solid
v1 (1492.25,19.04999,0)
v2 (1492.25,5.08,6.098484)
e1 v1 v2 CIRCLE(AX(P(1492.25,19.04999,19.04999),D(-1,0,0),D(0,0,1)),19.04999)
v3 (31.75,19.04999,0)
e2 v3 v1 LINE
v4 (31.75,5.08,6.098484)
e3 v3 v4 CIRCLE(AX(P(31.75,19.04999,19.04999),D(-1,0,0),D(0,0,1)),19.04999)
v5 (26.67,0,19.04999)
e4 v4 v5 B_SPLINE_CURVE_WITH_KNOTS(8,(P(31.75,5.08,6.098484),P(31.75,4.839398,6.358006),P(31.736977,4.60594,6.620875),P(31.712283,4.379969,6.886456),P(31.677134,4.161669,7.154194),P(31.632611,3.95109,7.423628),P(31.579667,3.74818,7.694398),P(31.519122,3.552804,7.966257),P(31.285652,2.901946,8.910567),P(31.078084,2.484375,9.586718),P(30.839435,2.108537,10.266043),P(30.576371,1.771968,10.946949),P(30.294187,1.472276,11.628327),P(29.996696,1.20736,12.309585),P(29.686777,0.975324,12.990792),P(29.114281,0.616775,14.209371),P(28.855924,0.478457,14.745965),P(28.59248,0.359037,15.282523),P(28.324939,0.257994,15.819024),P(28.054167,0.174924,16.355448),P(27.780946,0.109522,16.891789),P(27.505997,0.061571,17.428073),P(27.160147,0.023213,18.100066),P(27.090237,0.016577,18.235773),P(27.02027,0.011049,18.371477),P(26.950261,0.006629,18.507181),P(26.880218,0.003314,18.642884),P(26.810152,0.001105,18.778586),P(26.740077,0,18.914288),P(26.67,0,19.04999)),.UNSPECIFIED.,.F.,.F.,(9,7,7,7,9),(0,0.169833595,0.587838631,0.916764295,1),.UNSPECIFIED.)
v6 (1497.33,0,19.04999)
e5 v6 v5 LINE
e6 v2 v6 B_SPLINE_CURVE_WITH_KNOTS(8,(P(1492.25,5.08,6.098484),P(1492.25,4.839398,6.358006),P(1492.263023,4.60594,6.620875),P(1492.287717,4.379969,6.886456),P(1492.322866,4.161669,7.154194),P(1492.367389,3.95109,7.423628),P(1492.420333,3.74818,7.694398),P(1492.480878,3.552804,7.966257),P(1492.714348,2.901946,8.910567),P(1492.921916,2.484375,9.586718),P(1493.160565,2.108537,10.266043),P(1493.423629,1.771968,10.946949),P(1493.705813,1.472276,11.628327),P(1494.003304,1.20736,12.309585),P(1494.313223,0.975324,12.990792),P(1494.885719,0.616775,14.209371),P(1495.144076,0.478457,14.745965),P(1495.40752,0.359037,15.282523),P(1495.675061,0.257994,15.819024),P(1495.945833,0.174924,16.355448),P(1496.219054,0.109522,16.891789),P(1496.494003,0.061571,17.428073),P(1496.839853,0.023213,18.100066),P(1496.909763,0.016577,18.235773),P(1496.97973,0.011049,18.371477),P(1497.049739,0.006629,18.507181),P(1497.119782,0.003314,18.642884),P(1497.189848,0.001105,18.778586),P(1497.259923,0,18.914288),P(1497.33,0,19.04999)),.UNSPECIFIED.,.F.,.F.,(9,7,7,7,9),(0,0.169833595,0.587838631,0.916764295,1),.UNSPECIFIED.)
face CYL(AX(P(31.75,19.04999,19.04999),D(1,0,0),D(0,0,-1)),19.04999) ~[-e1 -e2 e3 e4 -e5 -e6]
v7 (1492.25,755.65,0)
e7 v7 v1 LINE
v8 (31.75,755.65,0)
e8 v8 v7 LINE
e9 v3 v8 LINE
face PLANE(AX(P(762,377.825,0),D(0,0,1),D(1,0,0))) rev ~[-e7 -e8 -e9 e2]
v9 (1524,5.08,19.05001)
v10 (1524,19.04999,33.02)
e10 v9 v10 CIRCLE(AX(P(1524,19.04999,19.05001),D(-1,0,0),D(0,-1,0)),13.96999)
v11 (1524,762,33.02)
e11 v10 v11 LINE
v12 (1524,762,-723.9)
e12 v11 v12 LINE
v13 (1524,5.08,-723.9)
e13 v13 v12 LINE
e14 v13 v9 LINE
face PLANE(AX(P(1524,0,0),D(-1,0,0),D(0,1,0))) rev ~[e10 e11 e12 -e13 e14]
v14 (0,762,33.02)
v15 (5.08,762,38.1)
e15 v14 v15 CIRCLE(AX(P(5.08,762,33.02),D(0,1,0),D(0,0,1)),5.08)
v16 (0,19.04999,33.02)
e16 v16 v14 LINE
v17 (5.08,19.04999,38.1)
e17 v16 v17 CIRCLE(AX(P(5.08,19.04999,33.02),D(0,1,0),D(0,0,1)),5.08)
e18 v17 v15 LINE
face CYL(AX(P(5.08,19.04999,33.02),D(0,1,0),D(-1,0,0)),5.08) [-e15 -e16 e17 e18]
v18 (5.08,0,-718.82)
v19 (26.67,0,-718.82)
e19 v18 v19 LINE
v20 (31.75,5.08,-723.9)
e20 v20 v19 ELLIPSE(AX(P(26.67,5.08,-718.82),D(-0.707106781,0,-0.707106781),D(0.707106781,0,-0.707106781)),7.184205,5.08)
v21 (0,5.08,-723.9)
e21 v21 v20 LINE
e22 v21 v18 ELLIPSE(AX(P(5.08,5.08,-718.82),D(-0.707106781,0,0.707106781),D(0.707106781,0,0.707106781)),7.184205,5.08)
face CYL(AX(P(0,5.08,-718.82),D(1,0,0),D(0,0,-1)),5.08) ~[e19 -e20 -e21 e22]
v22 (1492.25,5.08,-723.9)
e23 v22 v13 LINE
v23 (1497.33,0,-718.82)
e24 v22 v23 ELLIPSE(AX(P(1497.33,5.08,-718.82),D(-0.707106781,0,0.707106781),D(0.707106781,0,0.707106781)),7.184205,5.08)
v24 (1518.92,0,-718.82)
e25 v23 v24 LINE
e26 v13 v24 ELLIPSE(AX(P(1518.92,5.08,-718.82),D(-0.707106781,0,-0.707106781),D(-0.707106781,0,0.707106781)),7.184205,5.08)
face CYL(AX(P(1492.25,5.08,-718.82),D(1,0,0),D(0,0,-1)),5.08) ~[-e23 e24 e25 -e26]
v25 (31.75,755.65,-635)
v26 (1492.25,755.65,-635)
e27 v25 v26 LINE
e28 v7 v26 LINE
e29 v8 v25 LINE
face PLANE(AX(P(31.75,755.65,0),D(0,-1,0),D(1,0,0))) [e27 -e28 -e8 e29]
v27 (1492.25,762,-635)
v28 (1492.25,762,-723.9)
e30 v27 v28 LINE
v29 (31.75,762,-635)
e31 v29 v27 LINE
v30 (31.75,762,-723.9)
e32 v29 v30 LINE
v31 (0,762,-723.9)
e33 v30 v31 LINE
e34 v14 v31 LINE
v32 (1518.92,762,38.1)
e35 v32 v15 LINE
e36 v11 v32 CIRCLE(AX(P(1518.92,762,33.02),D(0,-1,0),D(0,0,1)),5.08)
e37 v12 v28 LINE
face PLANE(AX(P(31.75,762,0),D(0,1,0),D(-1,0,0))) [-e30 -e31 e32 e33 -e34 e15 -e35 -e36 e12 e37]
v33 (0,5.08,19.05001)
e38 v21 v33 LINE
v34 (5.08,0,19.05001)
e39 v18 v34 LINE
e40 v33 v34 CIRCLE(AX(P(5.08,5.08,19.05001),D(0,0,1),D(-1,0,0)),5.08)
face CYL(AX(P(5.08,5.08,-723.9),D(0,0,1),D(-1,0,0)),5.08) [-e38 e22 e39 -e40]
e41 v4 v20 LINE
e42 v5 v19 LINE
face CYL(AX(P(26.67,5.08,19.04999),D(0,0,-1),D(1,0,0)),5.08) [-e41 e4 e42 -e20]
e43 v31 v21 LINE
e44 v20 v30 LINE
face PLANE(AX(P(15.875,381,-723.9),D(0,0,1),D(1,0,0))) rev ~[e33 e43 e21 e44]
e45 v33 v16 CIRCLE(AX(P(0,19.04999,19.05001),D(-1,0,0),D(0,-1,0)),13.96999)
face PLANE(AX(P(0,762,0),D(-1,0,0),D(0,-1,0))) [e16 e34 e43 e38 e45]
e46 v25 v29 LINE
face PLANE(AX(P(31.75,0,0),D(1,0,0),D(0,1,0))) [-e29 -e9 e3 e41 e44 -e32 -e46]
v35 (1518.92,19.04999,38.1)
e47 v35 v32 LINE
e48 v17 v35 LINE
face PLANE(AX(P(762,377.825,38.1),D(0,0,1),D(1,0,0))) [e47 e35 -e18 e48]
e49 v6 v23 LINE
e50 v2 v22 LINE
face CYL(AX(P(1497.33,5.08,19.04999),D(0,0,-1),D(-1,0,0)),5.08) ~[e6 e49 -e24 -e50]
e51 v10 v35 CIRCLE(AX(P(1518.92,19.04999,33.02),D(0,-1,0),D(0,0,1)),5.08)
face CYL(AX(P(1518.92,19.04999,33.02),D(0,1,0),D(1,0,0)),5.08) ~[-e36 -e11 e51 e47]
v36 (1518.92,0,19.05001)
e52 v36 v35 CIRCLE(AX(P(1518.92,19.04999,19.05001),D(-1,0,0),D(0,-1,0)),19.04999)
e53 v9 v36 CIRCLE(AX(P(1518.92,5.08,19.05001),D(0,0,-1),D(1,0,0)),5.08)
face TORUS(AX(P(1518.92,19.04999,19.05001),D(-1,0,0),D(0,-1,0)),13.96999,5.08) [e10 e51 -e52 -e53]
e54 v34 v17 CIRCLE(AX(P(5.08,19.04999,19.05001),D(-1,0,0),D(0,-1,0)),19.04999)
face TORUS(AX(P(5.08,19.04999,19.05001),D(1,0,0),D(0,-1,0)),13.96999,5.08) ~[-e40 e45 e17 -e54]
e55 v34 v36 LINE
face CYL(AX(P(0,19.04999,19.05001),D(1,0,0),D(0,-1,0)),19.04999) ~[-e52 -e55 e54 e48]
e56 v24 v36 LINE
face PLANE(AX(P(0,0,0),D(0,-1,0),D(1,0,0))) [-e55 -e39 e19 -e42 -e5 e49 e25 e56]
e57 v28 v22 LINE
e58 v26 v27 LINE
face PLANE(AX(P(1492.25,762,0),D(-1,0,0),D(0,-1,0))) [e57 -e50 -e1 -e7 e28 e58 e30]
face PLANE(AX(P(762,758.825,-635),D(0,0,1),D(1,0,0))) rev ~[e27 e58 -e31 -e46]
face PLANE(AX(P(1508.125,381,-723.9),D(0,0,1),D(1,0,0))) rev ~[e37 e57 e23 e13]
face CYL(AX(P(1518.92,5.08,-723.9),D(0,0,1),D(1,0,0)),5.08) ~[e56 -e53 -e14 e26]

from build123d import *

# Parameters (mm, degrees)
F0_W     = 1460.5
F0_H     = 755.65
F0_H_2   = 6.35
F1_DEPTH = 38.1
F2_DEPTH = 723.9
F3_DEPTH = 635
F4_R     = 19.04999
F5_R     = 5.08


# Not quite as in the source:
# - a fillet or chamfer is up to 0.001 mm smaller than in the source, because OpenCascade refuses the exact size


with BuildPart() as f1:
    # F0 (on Top) → F1 (new body)
    with BuildSketch(Plane.XY):
        with Locations((762, 377.825)):
            Rectangle(F0_W, F0_H)
        Polygon((0, 762), (0, 0), (31.75, 0), (31.75, 755.65), (31.75, 762), align=None)
        with Locations((762, 758.825)):
            Rectangle(F0_W, F0_H_2)
        Polygon((1492.25, 755.65), (1492.25, 0), (1524, 0), (1524, 762), (1492.25, 762), align=None)
    extrude(amount=F1_DEPTH)

    # F0 (on Top) → F2 (join)
    with BuildSketch(Plane.XY):
        Polygon((0, 762), (0, 0), (31.75, 0), (31.75, 755.65), (31.75, 762), align=None)
        Polygon((1492.25, 755.65), (1492.25, 0), (1524, 0), (1524, 762), (1492.25, 762), align=None)
    extrude(amount=-F2_DEPTH)

    # F0 (on Top) → F3 (join)
    with BuildSketch(Plane.XY):
        with Locations((762, 758.825)):
            Rectangle(F0_W, F0_H_2)
    extrude(amount=-F3_DEPTH)

    # F4 (radius 19.05 in the source; OpenCascade refuses exactly that, so slightly less here)
    f4_edges = [f1.edges().sort_by_distance(p)[0] for p in [
        (762, 0, 38.1),
        (762, 0, 0),
    ]]
    fillet(f4_edges, radius=F4_R)

    # F5
    f5_edges = [f1.edges().sort_by_distance(p)[0] for p in [
        (1524, 0, -352.424995),
        (762, 0, 19.05001),
        (1508.125, 0, -723.9),
        (0, 0, -352.424995),
        (1492.25, 0, -361.95),
        (15.875, 0, -723.9),
        (1492.25, 0, 9.524995),
        (31.75, 0, -361.95),
        (762, 0, 19.04999),
        (31.75, 0, 9.524995),
    ]]
    fillet(f5_edges, radius=F5_R)


solid = f1.part
